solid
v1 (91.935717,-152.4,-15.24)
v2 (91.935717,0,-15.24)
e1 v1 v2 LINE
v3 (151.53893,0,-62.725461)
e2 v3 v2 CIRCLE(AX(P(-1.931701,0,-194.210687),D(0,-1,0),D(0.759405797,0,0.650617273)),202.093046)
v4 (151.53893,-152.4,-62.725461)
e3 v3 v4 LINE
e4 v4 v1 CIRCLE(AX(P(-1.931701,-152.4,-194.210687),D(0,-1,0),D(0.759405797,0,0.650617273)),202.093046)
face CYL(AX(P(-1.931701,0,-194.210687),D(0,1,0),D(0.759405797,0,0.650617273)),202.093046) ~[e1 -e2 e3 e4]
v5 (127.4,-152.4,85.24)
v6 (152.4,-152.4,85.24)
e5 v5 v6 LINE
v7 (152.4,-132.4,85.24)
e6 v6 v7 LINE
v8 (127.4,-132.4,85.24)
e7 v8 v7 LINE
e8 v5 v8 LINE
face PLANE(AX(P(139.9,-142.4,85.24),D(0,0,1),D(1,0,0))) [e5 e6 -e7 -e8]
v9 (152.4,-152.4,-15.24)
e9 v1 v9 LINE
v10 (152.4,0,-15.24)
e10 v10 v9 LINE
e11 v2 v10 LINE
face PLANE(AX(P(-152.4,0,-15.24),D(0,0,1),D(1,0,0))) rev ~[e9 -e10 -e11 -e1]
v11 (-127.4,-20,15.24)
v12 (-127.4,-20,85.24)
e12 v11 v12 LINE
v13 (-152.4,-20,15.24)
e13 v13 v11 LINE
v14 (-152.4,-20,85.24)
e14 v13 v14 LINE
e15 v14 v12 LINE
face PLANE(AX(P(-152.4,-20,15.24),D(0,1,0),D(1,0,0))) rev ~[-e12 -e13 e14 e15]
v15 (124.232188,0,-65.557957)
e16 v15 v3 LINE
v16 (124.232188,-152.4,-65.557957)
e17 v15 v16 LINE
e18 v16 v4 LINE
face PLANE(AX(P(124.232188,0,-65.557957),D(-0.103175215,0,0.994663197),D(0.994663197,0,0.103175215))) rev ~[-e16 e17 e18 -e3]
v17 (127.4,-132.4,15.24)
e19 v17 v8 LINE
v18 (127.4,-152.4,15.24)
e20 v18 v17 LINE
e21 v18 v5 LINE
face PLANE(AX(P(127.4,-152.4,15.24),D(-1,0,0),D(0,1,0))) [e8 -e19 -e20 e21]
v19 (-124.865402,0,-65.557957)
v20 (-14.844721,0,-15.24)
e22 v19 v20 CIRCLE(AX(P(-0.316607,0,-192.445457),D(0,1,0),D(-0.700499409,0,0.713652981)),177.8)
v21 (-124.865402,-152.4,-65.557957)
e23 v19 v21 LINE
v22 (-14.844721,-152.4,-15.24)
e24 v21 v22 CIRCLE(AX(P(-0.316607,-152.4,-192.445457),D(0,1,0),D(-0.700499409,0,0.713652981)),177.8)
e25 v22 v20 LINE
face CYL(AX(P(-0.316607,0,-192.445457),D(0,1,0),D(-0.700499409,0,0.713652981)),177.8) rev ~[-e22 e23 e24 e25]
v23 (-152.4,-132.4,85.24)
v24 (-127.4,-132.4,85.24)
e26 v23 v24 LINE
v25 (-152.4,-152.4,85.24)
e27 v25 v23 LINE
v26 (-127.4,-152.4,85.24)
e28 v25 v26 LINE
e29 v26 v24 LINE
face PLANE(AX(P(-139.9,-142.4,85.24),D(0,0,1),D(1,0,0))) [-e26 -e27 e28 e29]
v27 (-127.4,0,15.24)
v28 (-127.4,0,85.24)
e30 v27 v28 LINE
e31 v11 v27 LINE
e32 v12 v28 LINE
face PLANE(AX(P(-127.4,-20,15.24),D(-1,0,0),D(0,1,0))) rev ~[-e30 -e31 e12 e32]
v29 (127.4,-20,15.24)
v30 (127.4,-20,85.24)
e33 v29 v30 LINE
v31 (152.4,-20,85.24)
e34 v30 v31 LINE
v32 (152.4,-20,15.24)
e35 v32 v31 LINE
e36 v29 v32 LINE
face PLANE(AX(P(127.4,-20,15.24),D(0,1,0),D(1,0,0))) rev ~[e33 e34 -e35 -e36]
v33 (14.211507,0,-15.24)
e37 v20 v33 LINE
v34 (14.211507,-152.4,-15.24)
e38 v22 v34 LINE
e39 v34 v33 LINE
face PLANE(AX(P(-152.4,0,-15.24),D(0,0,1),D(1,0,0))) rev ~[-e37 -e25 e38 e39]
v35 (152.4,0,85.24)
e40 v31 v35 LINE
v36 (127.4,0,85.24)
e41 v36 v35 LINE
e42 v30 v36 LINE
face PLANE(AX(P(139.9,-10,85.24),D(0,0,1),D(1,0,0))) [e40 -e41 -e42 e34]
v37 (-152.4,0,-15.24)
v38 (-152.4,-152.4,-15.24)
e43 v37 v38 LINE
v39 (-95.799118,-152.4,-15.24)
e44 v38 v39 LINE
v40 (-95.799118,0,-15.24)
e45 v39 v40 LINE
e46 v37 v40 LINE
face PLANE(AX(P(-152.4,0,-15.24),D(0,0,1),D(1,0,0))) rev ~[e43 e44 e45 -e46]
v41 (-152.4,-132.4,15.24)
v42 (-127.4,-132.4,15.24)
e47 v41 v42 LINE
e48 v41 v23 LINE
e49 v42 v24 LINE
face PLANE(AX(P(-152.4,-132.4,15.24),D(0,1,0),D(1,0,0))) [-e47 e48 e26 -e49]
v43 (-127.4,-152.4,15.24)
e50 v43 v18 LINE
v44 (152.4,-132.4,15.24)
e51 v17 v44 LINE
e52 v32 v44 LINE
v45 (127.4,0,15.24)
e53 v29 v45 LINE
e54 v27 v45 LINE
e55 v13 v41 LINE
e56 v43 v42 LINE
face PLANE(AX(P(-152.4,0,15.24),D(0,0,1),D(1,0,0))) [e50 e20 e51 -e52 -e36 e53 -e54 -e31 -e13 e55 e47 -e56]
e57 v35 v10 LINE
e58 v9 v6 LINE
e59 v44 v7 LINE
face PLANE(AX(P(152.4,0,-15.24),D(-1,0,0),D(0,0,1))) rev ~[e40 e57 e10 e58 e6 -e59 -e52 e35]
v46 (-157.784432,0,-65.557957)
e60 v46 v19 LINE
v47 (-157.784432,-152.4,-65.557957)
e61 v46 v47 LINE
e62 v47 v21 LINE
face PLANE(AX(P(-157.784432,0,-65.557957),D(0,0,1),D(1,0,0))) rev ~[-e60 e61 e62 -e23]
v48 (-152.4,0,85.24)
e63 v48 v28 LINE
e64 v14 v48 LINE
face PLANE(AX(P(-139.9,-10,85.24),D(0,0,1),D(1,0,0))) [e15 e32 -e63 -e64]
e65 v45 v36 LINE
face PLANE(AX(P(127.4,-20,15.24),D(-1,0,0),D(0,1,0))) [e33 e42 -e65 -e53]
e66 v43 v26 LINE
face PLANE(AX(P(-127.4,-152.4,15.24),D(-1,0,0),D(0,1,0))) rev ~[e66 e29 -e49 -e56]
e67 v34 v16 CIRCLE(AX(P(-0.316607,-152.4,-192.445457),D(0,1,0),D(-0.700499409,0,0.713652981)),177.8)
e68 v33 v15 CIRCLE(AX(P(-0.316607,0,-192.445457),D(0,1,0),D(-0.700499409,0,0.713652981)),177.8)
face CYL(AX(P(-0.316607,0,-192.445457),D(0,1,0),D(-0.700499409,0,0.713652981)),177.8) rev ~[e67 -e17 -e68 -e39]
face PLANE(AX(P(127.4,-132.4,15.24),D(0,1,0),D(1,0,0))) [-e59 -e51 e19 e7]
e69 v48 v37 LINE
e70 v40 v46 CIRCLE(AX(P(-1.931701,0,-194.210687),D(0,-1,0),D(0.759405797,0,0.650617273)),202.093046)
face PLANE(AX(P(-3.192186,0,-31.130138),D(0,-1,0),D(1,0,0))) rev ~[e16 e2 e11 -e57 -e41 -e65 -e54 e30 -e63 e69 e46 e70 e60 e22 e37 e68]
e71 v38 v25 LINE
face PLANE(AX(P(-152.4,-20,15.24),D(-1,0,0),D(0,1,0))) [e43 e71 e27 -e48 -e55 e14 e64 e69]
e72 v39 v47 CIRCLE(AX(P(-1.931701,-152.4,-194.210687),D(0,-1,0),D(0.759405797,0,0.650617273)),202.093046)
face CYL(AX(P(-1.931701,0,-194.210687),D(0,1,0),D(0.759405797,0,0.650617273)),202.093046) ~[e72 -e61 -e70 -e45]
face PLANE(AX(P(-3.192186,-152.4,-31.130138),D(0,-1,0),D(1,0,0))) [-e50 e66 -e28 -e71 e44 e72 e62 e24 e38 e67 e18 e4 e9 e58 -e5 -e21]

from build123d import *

# Parameters (mm, degrees)
F0_W     = 304.8
F0_H     = 30.48
F1_DEPTH = 152.4
F2_W     = 25
F2_H     = 20
F3_DEPTH = 70
F5_DEPTH = 152.4


# Not quite as in the source:
# - the program builds the solid bodies; features that only make, move or delete a surface that nothing else refers to are left out


with BuildPart() as f1:
    # F0 (on Front) → F1 (new body)
    with BuildSketch(Plane.XZ):
        Rectangle(F0_W, F0_H)
    extrude(amount=F1_DEPTH)

    # F2 (on face) → F3 (join)
    with BuildSketch(Plane.XY.offset(15.24)):
        with Locations((-139.9, -10)):
            Rectangle(F2_W, F2_H)
        with Locations((-139.9, -142.4)):
            Rectangle(F2_W, F2_H)
        with Locations((139.9, -10)):
            Rectangle(F2_W, F2_H)
        with Locations((139.9, -142.4)):
            Rectangle(F2_W, F2_H)
    extrude(amount=F3_DEPTH)

    # F4 (on Front) → F5 (join)
    with BuildSketch(Plane.XZ):
        with BuildLine():
            Line((124.2321878223, -65.5579566956), (151.5389296347, -62.7254612585))
            ThreePointArc((151.5389296347, -62.7254612585), (-3.7822030549, 7.8738857172), (-157.7844321728, -65.5579566956))
            Line((-157.7844321728, -65.5579566956), (-124.8654021339, -65.5579566956))
            ThreePointArc((-124.8654021339, -65.5579566956), (-0.3166071558, -14.6454567478), (124.2321878223, -65.5579566956))
        make_face()
    extrude(amount=F5_DEPTH)


solid = f1.part
